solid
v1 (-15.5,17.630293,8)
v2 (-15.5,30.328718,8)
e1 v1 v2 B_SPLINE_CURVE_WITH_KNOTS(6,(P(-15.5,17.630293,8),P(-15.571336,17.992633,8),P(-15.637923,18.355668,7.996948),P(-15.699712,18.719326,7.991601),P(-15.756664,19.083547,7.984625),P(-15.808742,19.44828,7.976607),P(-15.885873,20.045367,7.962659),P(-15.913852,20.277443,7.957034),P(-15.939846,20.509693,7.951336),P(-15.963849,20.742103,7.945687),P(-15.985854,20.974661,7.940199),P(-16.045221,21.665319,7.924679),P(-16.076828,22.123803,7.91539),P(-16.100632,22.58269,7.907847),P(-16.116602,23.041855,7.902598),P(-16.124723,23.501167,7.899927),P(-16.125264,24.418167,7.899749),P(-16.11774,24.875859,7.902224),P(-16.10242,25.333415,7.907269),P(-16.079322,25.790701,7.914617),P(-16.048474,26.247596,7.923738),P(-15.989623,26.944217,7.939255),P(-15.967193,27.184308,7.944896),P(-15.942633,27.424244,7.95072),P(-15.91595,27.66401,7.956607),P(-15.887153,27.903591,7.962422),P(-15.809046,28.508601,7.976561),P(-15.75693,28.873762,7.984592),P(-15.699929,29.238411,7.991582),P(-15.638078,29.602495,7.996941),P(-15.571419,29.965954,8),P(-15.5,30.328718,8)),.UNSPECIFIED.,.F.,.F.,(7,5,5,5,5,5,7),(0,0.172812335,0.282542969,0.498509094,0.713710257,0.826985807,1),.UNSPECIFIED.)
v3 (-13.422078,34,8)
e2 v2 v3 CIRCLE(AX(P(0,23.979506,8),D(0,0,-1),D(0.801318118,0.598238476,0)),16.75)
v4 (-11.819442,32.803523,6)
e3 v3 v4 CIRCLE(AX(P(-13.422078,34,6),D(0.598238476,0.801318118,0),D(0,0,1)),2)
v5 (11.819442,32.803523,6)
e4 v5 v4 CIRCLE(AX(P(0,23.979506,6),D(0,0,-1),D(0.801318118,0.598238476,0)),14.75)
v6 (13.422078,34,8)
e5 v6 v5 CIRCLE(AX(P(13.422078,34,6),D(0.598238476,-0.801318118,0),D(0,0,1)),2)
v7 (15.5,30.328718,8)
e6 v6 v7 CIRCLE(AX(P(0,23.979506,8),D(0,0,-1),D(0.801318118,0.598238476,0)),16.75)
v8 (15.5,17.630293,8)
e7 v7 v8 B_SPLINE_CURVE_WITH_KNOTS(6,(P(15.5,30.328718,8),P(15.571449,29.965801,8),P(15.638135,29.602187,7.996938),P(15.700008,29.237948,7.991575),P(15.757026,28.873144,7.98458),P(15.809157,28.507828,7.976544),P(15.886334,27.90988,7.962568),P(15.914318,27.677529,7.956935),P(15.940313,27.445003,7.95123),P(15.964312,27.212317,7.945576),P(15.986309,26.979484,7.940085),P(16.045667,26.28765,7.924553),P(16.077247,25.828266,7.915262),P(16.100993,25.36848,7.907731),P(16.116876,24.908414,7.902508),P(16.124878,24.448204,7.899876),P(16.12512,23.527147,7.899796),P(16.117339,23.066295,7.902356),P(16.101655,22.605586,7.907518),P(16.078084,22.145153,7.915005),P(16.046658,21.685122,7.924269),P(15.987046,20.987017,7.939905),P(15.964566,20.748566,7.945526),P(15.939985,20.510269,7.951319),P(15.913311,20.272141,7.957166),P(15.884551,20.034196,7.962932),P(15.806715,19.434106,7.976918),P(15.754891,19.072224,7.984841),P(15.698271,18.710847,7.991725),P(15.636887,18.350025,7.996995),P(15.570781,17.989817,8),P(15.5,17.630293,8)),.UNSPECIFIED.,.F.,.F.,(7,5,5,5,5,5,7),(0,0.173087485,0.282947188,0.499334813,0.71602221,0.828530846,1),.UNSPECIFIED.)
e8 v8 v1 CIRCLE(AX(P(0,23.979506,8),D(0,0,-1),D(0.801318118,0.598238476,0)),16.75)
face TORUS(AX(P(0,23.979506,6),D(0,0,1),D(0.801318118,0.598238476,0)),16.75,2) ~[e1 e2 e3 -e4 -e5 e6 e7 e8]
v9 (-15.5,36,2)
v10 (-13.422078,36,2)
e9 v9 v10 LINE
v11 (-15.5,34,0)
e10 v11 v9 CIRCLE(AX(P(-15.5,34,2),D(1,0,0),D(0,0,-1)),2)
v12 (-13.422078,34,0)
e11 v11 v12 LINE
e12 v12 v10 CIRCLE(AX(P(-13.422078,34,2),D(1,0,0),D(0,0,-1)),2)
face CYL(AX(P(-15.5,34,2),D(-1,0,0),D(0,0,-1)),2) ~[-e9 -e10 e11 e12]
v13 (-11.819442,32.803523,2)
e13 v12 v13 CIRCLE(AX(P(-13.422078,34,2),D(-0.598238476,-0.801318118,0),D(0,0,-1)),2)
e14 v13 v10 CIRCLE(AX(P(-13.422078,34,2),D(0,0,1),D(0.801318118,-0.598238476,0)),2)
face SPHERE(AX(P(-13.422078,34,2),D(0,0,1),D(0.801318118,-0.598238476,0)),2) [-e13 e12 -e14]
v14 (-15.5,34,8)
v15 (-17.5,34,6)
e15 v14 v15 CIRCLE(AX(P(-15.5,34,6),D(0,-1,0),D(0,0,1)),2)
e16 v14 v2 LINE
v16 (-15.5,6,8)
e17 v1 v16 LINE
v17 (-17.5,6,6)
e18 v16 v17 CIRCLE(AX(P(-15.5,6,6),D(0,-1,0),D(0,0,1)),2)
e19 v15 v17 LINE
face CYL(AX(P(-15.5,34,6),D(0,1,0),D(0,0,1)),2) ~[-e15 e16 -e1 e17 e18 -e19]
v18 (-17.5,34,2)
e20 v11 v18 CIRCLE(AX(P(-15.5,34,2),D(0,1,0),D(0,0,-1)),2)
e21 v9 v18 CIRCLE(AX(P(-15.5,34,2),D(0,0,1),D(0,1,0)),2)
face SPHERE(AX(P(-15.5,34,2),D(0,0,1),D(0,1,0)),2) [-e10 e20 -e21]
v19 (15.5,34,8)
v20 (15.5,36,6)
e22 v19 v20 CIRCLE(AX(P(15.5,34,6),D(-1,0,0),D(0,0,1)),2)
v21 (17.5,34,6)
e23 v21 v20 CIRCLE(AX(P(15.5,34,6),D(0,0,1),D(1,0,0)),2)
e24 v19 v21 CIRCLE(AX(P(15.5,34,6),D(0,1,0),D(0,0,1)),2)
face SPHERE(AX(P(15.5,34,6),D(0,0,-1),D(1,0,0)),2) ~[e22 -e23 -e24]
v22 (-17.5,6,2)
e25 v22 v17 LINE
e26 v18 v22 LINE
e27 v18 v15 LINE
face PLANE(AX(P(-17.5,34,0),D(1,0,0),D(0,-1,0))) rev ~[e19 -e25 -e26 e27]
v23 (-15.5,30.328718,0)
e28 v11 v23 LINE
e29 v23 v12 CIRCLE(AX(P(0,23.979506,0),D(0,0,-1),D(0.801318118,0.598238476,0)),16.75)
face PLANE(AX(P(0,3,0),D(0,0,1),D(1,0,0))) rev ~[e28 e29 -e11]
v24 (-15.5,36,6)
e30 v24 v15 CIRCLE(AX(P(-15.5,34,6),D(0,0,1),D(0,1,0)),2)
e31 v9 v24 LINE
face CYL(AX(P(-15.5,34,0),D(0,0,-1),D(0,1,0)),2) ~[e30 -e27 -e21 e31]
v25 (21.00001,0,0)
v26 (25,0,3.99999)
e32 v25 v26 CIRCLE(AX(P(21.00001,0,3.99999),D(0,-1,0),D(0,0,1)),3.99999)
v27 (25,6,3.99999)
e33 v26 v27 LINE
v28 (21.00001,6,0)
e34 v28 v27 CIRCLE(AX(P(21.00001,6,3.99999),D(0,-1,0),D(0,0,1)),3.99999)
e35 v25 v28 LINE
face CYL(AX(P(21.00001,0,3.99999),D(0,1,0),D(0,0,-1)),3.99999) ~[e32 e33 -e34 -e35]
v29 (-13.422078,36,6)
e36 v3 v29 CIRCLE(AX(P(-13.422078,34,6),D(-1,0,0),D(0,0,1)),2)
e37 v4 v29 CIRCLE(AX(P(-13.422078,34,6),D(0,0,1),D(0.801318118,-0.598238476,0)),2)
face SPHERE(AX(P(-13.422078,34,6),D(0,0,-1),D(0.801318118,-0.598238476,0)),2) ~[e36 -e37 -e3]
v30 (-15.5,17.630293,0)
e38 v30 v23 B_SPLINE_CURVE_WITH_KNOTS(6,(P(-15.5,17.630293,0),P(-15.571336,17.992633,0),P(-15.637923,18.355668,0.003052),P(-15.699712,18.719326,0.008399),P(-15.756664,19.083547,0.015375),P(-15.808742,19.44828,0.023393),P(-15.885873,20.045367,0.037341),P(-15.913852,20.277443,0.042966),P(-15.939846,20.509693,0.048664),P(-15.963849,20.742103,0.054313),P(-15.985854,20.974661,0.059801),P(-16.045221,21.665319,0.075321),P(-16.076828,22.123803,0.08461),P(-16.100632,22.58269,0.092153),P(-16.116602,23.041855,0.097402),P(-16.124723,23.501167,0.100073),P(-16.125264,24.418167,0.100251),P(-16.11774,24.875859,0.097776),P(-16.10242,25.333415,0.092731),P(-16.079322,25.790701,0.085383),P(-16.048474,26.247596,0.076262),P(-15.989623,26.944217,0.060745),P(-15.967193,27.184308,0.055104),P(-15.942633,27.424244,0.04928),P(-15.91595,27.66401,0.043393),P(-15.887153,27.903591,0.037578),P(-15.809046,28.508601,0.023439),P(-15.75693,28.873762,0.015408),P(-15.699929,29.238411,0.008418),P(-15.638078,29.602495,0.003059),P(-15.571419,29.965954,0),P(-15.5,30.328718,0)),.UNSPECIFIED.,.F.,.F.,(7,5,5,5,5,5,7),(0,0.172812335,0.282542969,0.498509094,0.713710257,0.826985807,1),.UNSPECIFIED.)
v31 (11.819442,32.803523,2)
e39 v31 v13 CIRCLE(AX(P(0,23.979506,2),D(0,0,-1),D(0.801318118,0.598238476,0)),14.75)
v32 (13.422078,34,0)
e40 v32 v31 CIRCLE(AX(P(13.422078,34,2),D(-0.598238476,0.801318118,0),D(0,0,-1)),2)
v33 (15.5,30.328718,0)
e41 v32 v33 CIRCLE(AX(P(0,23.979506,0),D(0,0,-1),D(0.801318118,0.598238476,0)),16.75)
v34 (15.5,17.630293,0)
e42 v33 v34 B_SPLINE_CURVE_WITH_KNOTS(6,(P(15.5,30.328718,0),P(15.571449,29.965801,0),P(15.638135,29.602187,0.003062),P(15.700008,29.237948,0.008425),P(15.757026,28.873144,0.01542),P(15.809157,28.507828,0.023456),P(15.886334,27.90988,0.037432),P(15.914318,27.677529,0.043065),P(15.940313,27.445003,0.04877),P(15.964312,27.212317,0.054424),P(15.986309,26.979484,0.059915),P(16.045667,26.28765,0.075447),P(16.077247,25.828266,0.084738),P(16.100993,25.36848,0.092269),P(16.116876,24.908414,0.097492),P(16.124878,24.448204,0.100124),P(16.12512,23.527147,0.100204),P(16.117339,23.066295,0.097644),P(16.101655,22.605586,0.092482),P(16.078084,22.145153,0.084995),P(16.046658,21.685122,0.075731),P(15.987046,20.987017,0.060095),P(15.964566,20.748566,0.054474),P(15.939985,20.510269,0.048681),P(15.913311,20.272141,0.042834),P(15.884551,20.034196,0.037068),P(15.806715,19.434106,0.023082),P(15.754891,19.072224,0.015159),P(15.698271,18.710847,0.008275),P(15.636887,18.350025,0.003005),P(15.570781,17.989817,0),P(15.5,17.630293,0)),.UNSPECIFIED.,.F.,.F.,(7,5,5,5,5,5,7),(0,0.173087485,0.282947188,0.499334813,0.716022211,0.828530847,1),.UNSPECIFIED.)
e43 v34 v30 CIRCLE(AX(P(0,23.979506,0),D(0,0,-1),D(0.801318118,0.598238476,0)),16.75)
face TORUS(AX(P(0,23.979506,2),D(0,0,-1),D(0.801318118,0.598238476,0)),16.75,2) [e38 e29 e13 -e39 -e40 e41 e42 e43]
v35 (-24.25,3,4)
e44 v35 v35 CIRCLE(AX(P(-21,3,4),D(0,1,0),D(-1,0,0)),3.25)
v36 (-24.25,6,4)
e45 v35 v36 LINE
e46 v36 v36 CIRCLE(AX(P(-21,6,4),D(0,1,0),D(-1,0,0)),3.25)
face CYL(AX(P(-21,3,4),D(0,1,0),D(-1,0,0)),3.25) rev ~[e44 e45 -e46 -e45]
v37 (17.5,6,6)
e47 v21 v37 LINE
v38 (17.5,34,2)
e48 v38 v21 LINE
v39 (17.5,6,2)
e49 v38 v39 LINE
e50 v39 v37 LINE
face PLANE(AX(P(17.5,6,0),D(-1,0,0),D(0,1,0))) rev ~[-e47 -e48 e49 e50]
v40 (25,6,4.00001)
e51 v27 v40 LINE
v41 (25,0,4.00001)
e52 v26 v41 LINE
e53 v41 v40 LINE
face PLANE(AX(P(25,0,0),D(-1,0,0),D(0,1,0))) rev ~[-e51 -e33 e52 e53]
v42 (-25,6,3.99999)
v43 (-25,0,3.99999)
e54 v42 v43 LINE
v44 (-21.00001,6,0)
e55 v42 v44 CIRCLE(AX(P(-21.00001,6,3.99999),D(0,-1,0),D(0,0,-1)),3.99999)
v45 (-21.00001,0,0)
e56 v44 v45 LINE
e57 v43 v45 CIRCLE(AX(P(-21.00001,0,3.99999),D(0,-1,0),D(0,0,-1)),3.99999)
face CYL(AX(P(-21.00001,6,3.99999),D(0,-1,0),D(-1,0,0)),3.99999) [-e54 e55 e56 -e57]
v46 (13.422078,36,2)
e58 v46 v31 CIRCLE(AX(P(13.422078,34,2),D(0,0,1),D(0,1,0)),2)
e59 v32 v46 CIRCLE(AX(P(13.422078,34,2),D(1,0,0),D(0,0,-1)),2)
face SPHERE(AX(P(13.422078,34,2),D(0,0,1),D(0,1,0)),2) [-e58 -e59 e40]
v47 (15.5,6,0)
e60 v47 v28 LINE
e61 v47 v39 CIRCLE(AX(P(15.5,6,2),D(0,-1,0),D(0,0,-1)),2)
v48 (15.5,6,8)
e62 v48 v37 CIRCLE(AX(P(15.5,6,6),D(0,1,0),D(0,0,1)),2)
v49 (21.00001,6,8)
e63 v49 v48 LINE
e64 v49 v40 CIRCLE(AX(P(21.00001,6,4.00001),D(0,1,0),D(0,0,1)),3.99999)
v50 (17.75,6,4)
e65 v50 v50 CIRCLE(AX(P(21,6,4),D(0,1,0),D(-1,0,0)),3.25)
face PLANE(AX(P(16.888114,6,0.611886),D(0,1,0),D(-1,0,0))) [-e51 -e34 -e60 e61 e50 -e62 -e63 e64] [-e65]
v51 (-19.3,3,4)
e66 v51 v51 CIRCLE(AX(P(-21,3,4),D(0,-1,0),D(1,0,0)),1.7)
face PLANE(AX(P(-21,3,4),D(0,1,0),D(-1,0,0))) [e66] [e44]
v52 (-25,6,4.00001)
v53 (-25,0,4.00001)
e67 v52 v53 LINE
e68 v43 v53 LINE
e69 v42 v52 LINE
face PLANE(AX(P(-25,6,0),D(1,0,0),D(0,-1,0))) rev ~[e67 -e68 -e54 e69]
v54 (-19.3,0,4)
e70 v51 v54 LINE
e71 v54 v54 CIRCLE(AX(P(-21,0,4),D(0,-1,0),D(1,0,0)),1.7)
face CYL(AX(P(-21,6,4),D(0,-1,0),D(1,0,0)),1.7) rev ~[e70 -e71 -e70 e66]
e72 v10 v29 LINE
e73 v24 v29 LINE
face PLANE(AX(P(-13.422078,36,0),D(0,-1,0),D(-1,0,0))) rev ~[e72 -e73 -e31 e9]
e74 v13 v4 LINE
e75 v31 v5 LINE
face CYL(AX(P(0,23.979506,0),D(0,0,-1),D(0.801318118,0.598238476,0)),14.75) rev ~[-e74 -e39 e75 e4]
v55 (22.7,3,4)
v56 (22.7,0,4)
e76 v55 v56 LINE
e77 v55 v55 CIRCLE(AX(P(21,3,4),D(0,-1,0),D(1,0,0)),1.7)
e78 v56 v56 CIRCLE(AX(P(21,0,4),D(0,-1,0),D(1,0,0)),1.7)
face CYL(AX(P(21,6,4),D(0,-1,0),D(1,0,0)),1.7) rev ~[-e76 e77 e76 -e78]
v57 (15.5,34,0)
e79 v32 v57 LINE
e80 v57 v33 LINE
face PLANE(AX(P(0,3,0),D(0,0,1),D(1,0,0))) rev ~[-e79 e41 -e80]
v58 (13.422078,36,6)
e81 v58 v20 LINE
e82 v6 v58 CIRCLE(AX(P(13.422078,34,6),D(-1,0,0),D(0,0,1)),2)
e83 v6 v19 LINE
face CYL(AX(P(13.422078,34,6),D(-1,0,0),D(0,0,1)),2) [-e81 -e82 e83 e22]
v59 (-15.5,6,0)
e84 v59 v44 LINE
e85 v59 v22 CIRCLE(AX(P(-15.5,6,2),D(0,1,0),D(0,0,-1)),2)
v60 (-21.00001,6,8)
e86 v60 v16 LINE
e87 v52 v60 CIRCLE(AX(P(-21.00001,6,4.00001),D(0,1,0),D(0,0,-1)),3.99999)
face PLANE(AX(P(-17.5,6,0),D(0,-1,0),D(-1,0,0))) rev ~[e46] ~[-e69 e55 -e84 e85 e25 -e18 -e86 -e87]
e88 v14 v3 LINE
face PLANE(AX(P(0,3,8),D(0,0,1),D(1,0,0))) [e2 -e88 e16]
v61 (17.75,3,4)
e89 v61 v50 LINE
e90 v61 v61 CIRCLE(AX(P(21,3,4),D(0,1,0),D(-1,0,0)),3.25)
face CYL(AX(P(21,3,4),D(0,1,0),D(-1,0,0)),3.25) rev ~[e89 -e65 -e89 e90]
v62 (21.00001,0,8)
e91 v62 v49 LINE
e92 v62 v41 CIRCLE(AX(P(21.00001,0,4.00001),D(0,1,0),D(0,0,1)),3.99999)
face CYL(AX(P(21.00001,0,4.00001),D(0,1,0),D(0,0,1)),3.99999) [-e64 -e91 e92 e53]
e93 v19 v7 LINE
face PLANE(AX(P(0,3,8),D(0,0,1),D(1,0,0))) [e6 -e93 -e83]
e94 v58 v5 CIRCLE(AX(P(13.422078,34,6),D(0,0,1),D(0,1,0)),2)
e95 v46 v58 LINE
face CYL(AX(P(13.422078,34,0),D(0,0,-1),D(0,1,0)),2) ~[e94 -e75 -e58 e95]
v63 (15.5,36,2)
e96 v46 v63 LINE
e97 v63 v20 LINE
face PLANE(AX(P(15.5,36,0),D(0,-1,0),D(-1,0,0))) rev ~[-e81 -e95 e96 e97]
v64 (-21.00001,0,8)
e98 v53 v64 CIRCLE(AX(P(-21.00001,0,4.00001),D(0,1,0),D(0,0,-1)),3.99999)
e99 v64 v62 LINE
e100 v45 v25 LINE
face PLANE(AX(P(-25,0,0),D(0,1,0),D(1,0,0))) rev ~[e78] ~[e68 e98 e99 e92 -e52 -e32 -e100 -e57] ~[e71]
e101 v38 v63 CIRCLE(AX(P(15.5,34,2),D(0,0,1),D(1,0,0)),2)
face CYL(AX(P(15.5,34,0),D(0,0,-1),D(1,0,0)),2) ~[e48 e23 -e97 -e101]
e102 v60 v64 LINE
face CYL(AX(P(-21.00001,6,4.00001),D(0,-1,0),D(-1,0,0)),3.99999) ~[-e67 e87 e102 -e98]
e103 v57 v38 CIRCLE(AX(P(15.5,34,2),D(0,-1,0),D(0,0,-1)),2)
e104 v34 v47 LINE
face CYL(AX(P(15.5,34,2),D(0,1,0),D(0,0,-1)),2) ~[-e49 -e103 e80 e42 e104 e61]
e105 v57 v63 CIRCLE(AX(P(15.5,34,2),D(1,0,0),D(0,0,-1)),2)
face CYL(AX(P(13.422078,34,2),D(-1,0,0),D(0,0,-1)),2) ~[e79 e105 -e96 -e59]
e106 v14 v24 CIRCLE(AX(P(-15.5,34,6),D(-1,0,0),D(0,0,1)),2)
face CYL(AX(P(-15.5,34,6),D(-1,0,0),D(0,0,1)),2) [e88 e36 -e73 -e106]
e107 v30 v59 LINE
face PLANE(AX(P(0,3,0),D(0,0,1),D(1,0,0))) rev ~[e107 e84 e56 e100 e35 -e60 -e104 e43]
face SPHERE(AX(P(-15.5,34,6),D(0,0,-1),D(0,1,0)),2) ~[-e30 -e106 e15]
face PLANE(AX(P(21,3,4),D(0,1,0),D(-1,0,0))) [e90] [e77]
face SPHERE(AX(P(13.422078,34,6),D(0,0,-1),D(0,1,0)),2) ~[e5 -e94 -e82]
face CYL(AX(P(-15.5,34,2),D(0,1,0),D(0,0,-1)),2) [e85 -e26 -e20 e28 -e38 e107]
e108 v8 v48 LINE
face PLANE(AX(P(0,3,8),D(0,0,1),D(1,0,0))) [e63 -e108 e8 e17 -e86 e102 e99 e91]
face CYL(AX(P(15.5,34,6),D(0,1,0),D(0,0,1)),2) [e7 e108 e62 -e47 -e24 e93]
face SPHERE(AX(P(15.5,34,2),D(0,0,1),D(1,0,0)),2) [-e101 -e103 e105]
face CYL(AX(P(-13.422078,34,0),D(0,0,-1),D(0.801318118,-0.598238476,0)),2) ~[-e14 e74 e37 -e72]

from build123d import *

# Parameters (mm, degrees)
F1_DEPTH             = 8
F4_D                 = 3.4
F4_CBORE_D           = 6.5
F4_CBORE_DEPTH       = 3
F4_ON_F3_D           = 3.4
F4_ON_F3_CBORE_D     = 6.5
F4_ON_F3_CBORE_DEPTH = 3
F5_T1_DEPTH          = 2.0779215299
F5_T3_DEPTH          = 28
F5_T5_DEPTH          = 2.0779215299
F5_T8_ANGLE          = 253.4876833877
F5_T10_ANGLE         = 253.4876833877
F5_T12_ANGLE         = 126.7438416939
F5_T14_ANGLE         = 126.7438416939
F5_T16_ANGLE         = 90
F5_T18_ANGLE         = 90
F5_T20_ANGLE         = 126.7438416939
F5_T22_ANGLE         = 126.7438416939
F5_T24_ANGLE         = 90
F5_T26_ANGLE         = 90
F6_R                 = 3.99999


# Not quite as in the source:
# - a fillet or chamfer that OpenCascade refuses, or shapes differently, is made with other operations: its cross-section is extruded or revolved along the edge and cut away or added
# - a fillet or chamfer is up to 0.001 mm smaller than in the source, because OpenCascade refuses the exact size


with BuildPart() as f1:
    # F0 (on Top) → F1 (new body)
    with BuildSketch(Plane.XY):
        Polygon((-25, 6), (-25, 0), (25, 0), (25, 6), (17.5, 6), (-17.5, 6), align=None)
        with BuildLine():
            Line((-17.5, 34), (-17.5, 6))
            Line((-17.5, 6), (17.5, 6))
            Line((17.5, 6), (17.5, 34))
            ThreePointArc((17.5, 34), (16.9142135624, 35.4142135624), (15.5, 36))
            Line((15.5, 36), (13.4220784701, 36))
            ThreePointArc((13.4220784701, 36), (11.634209081, 34.896394471), (11.8194422349, 32.8035230476))
            ThreePointArc((11.8194422349, 32.8035230476), (0, 9.229505524), (-11.8194422349, 32.8035230476))
            ThreePointArc((-11.8194422349, 32.8035230476), (-11.634209081, 34.896394471), (-13.4220784701, 36))
            Line((-13.4220784701, 36), (-15.5, 36))
            ThreePointArc((-15.5, 36), (-16.9142135624, 35.4142135624), (-17.5, 34))
        make_face()
    extrude(amount=F1_DEPTH)

    # F4 (through all)
    with Locations(Plane(origin=(0, 6, 0), x_dir=(-1, 0, 0), z_dir=(0, 1, 0))):
        with Locations((-21, 4)):
            CounterBoreHole(F4_D / 2, F4_CBORE_D / 2, F4_CBORE_DEPTH)

    # F4 on F3 (through all)
    with Locations(Plane(origin=(0, 6, 0), x_dir=(-1, 0, 0), z_dir=(0, 1, 0))):
        with Locations((21, 4)):
            CounterBoreHole(F4_ON_F3_D / 2, F4_ON_F3_CBORE_D / 2, F4_ON_F3_CBORE_DEPTH)

    # F5: fillet of radius 2 on 2 edges, made by hand

    # F5_s2 → F5_t1 (cut)
    with BuildSketch(Plane.YZ.offset(-15.5)):
        with BuildLine():
            ThreePointArc((34, 8), (35.4142135624, 7.4142135624), (36, 6))
            Line((36, 6), (36, 8))
            Line((36, 8), (34, 8))
        make_face()
        with BuildLine():
            ThreePointArc((34, 0), (35.4142135624, 0.5857864376), (36, 2))
            Line((36, 2), (36, 0))
            Line((36, 0), (34, 0))
        make_face()
    extrude(amount=F5_T1_DEPTH, mode=Mode.SUBTRACT)

    # F5_s4 → F5_t3 (cut)
    with BuildSketch(Plane.XZ.offset(-34)):
        with BuildLine():
            ThreePointArc((-15.5, 8), (-16.9142135624, 7.4142135624), (-17.5, 6))
            Line((-17.5, 6), (-17.5, 8))
            Line((-17.5, 8), (-15.5, 8))
        make_face()
        with BuildLine():
            ThreePointArc((15.5, 8), (16.9142135624, 7.4142135624), (17.5, 6))
            Line((17.5, 6), (17.5, 8))
            Line((17.5, 8), (15.5, 8))
        make_face()
        with BuildLine():
            ThreePointArc((-15.5, 0), (-16.9142135624, 0.5857864376), (-17.5, 2))
            Line((-17.5, 2), (-17.5, 0))
            Line((-17.5, 0), (-15.5, 0))
        make_face()
        with BuildLine():
            ThreePointArc((15.5, 0), (16.9142135624, 0.5857864376), (17.5, 2))
            Line((17.5, 2), (17.5, 0))
            Line((17.5, 0), (15.5, 0))
        make_face()
    extrude(amount=F5_T3_DEPTH, mode=Mode.SUBTRACT)

    # F5_s6 → F5_t5 (cut)
    with BuildSketch(Plane.YZ.offset(13.4220784701)):
        with BuildLine():
            ThreePointArc((34, 8), (35.4142135624, 7.4142135624), (36, 6))
            Line((36, 6), (36, 8))
            Line((36, 8), (34, 8))
        make_face()
        with BuildLine():
            ThreePointArc((34, 0), (35.4142135624, 0.5857864376), (36, 2))
            Line((36, 2), (36, 0))
            Line((36, 0), (34, 0))
        make_face()
    extrude(amount=F5_T5_DEPTH, mode=Mode.SUBTRACT)

    # F5_s7 → F5_t8 (revolve, cut)
    with BuildSketch(Plane(origin=(-11.4952792826, 15.3974976921, 0), x_dir=(0, 0, 1), z_dir=(-0.5982384762, 0.8013181176, 0))):
        with BuildLine():
            ThreePointArc((0, 31.0954628442), (0.5857864376, 29.6812492818), (2, 29.0954628442))
            Line((2, 29.0954628442), (0, 29.0954628442))
            Line((0, 29.0954628442), (0, 31.0954628442))
        make_face()
    revolve(axis=Axis((0, 23.979505524, 0), (0, 0, -1)), revolution_arc=F5_T8_ANGLE, mode=Mode.SUBTRACT)

    # F5_s9 → F5_t10 (revolve, cut)
    with BuildSketch(Plane(origin=(-11.4952792826, 15.3974976921, 0), x_dir=(0, 0, 1), z_dir=(-0.5982384762, 0.8013181176, 0))):
        with BuildLine():
            ThreePointArc((8, 31.0954628442), (7.4142135624, 29.6812492818), (6, 29.0954628442))
            Line((6, 29.0954628442), (8, 29.0954628442))
            Line((8, 29.0954628442), (8, 31.0954628442))
        make_face()
    revolve(axis=Axis((0, 23.979505524, 8), (0, 0, -1)), revolution_arc=F5_T10_ANGLE, mode=Mode.SUBTRACT)

    # F5_s11 → F5_t12 (revolve, cut)
    with BuildSketch(Plane.YZ.offset(13.4220784701)):
        with BuildLine():
            ThreePointArc((34, 8), (35.4142135624, 7.4142135624), (36, 6))
            Line((36, 6), (36, 8))
            Line((36, 8), (34, 8))
        make_face()
    revolve(axis=Axis((13.4220784701, 34, 8), (0, 0, 1)), revolution_arc=F5_T12_ANGLE, mode=Mode.SUBTRACT)

    # F5_s13 → F5_t14 (revolve, cut)
    with BuildSketch(Plane(origin=(11.4952792826, 15.3974976921, 0), x_dir=(0, 0, 1), z_dir=(-0.5982384762, -0.8013181176, 0))):
        with BuildLine():
            ThreePointArc((8, 31.0954628442), (7.4142135624, 29.6812492818), (6, 29.0954628442))
            Line((6, 29.0954628442), (8, 29.0954628442))
            Line((8, 29.0954628442), (8, 31.0954628442))
        make_face()
    revolve(axis=Axis((-13.4220784701, 34, 8), (0, 0, 1)), revolution_arc=F5_T14_ANGLE, mode=Mode.SUBTRACT)

    # F5_s15 → F5_t16 (revolve, cut)
    with BuildSketch(Plane.YZ.offset(-15.5)):
        with BuildLine():
            ThreePointArc((34, 8), (35.4142135624, 7.4142135624), (36, 6))
            Line((36, 6), (36, 8))
            Line((36, 8), (34, 8))
        make_face()
    revolve(axis=Axis((-15.5, 34, 8), (0, 0, 1)), revolution_arc=F5_T16_ANGLE, mode=Mode.SUBTRACT)

    # F5_s17 → F5_t18 (revolve, cut)
    with BuildSketch(Plane.XZ.offset(-34)):
        with BuildLine():
            ThreePointArc((15.5, 8), (16.9142135624, 7.4142135624), (17.5, 6))
            Line((17.5, 6), (17.5, 8))
            Line((17.5, 8), (15.5, 8))
        make_face()
    revolve(axis=Axis((15.5, 34, 8), (0, 0, 1)), revolution_arc=F5_T18_ANGLE, mode=Mode.SUBTRACT)

    # F5_s19 → F5_t20 (revolve, cut)
    with BuildSketch(Plane.YZ.offset(13.4220784701)):
        with BuildLine():
            ThreePointArc((34, 0), (35.4142135624, 0.5857864376), (36, 2))
            Line((36, 2), (36, 0))
            Line((36, 0), (34, 0))
        make_face()
    revolve(axis=Axis((13.4220784701, 34, 0), (0, 0, 1)), revolution_arc=F5_T20_ANGLE, mode=Mode.SUBTRACT)

    # F5_s21 → F5_t22 (revolve, cut)
    with BuildSketch(Plane(origin=(11.4952792826, 15.3974976921, 0), x_dir=(0, 0, 1), z_dir=(-0.5982384762, -0.8013181176, 0))):
        with BuildLine():
            ThreePointArc((0, 31.0954628442), (0.5857864376, 29.6812492818), (2, 29.0954628442))
            Line((2, 29.0954628442), (0, 29.0954628442))
            Line((0, 29.0954628442), (0, 31.0954628442))
        make_face()
    revolve(axis=Axis((-13.4220784701, 34, 0), (0, 0, 1)), revolution_arc=F5_T22_ANGLE, mode=Mode.SUBTRACT)

    # F5_s23 → F5_t24 (revolve, cut)
    with BuildSketch(Plane.YZ.offset(-15.5)):
        with BuildLine():
            ThreePointArc((34, 0), (35.4142135624, 0.5857864376), (36, 2))
            Line((36, 2), (36, 0))
            Line((36, 0), (34, 0))
        make_face()
    revolve(axis=Axis((-15.5, 34, 0), (0, 0, 1)), revolution_arc=F5_T24_ANGLE, mode=Mode.SUBTRACT)

    # F5_s25 → F5_t26 (revolve, cut)
    with BuildSketch(Plane.XZ.offset(-34)):
        with BuildLine():
            ThreePointArc((15.5, 0), (16.9142135624, 0.5857864376), (17.5, 2))
            Line((17.5, 2), (17.5, 0))
            Line((17.5, 0), (15.5, 0))
        make_face()
    revolve(axis=Axis((15.5, 34, 0), (0, 0, 1)), revolution_arc=F5_T26_ANGLE, mode=Mode.SUBTRACT)

    # F6 (radius 4 in the source; OpenCascade refuses exactly that, so slightly less here)
    f6_edges = [f1.edges().sort_by_distance(p)[0] for p in [
        (-25, 3, 0),
        (-25, 3, 8),
        (25, 3, 0),
        (25, 3, 8),
    ]]
    fillet(f6_edges, radius=F6_R)


solid = f1.part
